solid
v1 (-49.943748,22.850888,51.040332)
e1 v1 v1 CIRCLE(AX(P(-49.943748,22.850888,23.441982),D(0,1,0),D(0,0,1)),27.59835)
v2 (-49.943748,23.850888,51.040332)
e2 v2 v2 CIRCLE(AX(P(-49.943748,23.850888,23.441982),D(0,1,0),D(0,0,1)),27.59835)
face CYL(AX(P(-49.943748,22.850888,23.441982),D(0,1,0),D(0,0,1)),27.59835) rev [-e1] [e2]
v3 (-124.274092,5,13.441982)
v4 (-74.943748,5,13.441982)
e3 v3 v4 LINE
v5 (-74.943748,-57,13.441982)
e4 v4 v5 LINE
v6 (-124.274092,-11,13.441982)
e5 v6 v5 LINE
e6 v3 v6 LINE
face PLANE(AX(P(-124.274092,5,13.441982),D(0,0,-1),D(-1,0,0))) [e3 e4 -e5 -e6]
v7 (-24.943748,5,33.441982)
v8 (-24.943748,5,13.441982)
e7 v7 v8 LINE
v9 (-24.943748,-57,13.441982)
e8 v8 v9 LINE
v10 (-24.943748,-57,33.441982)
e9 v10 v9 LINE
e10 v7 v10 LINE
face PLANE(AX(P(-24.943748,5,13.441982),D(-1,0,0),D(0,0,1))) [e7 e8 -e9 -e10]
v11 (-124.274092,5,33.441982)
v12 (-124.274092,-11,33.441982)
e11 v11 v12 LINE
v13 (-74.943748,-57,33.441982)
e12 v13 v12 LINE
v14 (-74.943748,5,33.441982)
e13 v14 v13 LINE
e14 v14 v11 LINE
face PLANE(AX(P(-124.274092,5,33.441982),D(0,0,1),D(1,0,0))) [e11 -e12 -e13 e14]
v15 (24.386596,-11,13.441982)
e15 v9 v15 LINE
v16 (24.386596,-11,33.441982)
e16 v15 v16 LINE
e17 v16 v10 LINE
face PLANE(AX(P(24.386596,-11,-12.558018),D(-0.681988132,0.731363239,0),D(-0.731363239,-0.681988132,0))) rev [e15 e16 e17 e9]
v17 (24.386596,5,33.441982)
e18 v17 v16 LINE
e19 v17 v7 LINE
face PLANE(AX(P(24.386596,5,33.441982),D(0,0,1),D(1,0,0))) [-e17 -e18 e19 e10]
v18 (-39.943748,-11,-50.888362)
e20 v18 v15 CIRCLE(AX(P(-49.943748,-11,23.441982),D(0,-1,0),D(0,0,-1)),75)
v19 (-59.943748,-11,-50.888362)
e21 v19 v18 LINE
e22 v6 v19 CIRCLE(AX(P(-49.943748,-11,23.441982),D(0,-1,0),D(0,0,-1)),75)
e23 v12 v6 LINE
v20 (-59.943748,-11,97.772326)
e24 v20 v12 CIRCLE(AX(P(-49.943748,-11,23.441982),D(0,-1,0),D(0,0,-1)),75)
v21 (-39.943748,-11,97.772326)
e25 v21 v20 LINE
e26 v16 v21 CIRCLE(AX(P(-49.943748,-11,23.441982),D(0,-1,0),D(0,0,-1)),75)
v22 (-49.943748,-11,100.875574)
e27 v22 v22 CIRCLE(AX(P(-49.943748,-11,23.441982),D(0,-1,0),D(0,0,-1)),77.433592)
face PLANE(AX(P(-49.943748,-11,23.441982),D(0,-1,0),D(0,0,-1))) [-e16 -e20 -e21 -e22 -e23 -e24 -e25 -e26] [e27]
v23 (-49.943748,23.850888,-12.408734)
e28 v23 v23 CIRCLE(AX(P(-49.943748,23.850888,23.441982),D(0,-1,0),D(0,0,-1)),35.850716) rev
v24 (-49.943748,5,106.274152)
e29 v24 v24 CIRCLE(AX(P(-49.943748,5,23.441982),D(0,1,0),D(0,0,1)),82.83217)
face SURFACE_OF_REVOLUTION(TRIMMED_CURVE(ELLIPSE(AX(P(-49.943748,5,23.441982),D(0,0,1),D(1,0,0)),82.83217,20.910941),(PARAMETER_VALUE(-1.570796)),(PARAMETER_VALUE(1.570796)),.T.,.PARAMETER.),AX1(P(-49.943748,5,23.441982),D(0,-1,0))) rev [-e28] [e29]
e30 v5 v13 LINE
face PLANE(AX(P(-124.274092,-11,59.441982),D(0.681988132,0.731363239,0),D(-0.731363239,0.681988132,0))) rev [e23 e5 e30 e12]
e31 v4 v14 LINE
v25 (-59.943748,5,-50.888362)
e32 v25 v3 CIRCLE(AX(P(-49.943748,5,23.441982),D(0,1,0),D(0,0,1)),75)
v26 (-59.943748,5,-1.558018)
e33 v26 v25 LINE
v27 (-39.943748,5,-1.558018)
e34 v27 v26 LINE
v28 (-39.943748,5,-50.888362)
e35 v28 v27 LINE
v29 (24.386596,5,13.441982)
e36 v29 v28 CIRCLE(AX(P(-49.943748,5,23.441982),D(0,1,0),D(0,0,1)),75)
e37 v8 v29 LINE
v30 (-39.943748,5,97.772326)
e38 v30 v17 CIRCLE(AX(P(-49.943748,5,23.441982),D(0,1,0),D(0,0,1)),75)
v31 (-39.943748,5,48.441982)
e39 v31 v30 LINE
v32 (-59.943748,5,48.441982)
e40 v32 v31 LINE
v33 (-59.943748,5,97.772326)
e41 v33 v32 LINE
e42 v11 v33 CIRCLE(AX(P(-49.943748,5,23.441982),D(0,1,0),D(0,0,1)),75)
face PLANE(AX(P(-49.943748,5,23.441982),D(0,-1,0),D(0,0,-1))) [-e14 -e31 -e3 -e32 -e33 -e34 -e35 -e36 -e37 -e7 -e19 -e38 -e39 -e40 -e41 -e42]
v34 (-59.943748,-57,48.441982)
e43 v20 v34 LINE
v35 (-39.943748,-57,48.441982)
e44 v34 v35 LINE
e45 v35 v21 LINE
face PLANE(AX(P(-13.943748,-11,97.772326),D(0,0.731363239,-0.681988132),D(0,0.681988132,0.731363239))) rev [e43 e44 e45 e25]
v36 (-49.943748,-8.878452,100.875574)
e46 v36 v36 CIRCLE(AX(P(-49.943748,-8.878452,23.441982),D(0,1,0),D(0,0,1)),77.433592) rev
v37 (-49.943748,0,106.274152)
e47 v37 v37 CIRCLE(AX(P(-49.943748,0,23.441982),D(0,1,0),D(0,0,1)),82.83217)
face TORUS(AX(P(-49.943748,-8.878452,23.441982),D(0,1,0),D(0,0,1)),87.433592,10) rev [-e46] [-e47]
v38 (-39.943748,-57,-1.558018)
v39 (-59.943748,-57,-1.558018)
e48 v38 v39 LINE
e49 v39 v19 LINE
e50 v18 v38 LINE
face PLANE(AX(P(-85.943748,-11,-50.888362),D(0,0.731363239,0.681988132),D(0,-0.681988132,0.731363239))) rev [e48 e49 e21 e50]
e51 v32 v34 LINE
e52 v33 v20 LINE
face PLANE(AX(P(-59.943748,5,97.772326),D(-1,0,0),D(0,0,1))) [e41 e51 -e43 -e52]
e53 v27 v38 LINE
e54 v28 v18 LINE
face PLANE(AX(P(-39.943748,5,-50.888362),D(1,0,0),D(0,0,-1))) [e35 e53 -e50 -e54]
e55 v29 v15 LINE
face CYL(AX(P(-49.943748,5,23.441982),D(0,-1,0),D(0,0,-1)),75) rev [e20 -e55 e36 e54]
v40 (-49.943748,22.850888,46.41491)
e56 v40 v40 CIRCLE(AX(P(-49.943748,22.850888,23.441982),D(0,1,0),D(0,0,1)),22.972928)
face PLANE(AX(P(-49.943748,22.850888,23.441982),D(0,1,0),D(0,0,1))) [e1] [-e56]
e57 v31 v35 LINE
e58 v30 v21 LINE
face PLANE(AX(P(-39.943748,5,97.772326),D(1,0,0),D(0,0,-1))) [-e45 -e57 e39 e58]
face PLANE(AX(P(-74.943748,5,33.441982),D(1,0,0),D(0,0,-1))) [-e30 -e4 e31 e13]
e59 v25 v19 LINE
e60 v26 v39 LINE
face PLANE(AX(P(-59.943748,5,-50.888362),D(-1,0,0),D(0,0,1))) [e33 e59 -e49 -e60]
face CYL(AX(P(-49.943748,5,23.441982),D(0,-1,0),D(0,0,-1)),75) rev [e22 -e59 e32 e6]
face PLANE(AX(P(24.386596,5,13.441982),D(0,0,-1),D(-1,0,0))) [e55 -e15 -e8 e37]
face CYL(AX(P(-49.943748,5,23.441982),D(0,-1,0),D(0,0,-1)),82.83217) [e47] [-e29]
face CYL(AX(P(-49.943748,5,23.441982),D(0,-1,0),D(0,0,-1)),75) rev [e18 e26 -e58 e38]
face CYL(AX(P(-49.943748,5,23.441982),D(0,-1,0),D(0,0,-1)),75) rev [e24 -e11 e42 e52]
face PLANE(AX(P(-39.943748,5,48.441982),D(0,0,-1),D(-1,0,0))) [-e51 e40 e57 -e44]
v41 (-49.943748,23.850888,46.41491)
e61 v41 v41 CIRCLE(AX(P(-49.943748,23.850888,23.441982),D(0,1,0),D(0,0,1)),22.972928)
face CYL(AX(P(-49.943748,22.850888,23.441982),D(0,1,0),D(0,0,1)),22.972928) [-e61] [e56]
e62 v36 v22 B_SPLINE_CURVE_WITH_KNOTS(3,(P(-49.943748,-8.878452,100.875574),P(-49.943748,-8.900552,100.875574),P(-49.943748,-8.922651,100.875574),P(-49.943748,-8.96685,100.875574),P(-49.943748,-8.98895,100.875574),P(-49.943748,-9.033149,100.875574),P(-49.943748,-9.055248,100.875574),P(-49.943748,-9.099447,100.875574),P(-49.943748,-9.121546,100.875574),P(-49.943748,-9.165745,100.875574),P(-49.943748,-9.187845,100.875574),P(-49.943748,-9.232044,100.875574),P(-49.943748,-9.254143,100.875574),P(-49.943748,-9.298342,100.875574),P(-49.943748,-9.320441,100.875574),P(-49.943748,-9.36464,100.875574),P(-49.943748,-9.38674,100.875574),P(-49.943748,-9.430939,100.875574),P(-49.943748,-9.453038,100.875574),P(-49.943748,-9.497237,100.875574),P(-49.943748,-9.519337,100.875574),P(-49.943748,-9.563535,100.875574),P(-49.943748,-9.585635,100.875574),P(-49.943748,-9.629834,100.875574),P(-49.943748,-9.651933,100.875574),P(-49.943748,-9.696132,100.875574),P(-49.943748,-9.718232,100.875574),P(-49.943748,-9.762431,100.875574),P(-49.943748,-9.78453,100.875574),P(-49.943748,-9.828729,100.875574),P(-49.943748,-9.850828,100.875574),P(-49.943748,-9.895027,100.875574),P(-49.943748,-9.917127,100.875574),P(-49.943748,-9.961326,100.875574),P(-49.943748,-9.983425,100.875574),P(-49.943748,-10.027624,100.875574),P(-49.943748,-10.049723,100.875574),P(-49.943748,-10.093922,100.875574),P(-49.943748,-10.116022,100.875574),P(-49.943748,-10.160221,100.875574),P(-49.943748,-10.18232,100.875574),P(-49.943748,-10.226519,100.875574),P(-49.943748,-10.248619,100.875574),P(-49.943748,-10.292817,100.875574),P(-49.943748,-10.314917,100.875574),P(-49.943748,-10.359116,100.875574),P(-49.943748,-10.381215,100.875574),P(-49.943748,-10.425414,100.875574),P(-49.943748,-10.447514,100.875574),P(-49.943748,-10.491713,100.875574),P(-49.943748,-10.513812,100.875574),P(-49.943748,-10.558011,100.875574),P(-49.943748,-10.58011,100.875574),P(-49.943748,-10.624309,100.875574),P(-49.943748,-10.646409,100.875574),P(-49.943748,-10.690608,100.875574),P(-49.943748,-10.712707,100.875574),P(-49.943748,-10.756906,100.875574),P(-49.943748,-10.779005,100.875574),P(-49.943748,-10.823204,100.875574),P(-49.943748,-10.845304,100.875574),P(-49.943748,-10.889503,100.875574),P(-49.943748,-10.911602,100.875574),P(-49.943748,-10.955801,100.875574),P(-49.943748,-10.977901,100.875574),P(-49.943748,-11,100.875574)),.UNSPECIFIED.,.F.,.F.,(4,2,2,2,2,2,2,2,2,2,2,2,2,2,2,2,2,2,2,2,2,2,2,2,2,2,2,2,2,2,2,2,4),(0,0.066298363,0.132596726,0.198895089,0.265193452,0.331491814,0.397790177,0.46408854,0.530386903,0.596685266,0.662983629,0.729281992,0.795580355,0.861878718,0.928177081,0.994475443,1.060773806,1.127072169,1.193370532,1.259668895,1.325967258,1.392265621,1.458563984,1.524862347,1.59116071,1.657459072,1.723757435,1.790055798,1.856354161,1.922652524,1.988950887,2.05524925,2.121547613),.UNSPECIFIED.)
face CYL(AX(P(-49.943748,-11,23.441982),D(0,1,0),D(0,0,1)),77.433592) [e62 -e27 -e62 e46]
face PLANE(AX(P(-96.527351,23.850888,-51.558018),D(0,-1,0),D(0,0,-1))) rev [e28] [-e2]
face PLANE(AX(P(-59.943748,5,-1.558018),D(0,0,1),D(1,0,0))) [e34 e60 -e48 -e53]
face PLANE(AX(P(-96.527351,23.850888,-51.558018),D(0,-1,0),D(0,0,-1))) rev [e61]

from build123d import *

# Parameters (mm, degrees)
SKETCH1_R           = 82.832169861
BOSS_EXTRUDE1_DEPTH = 5
SKETCH3_W           = 93.167206873
SKETCH3_H           = 4.120105984
CUT_EXTRUDE1_DEPTH  = 75
SKETCH4_R           = 27.598349682
SKETCH4_R_2         = 22.972927947
CUT_EXTRUDE2_DEPTH  = 1
BOSS_EXTRUDE2_START = 11
SKETCH5_R           = 77.433591729
BOSS_EXTRUDE2_DEPTH = 11
FILLET1_R           = 10
SKETCH6_W           = 49.330343736
SKETCH6_H           = 20
BOSS_EXTRUDE3_DEPTH = 46
CUT_EXTRUDE3_DEPTH  = 46
CIRPATTERN1_COUNT   = 4


with BuildPart() as part:
    # Sketch1 → Boss-Extrude1 (new body)
    with BuildSketch(Plane(origin=(0, 0, 0), x_dir=(1, 0, 0), z_dir=(0, 1, 0))):
        with Locations(Location((-49.943747887, -23.441982102, 0), (0, 0, 270))):
            Circle(SKETCH1_R)
        with BuildLine():
            Line((-59.943747887, 50.888361635), (-59.943747887, 1.558017898))
            Line((-59.943747887, 1.558017898), (-39.943747887, 1.558017898))
            Line((-39.943747887, 1.558017898), (-39.943747887, 50.888361635))
            ThreePointArc((-39.943747887, 50.888361635), (3.089260702, 29.591026487), (24.386595849, -13.441982102))
            Line((24.386595849, -13.441982102), (-24.943747887, -13.441982102))
            Line((-24.943747887, -13.441982102), (-24.943747887, -33.441982102))
            Line((-24.943747887, -33.441982102), (24.386595849, -33.441982102))
            ThreePointArc((24.386595849, -33.441982102), (3.089260702, -76.474990691), (-39.943747887, -97.772325838))
            Line((-39.943747887, -97.772325838), (-39.943747887, -48.441982102))
            Line((-39.943747887, -48.441982102), (-59.943747887, -48.441982102))
            Line((-59.943747887, -48.441982102), (-59.943747887, -97.772325838))
            ThreePointArc((-59.943747887, -97.772325838), (-102.976756476, -76.474990691), (-124.274091624, -33.441982102))
            Line((-124.274091624, -33.441982102), (-74.943747887, -33.441982102))
            Line((-74.943747887, -33.441982102), (-74.943747887, -13.441982102))
            Line((-74.943747887, -13.441982102), (-124.274091624, -13.441982102))
            ThreePointArc((-124.274091624, -13.441982102), (-102.976756476, 29.591026487), (-59.943747887, 50.888361635))
        make_face(mode=Mode.SUBTRACT)
    extrude(amount=BOSS_EXTRUDE1_DEPTH)

    # Sketch2 → Revolve1 (revolve)
    with BuildSketch(Plane.XY.offset(23.441982102)):
        with BuildLine():
            Line((-49.943747887, 5), (-49.943747887, 25.910941369))
            add(Edge.make_bspline(
                [(32.888421974, 5), (32.888421974, 25.910941369), (-49.943747887, 25.910941369)],
                knots=[0, 0, 0, 1.570796327, 1.570796327, 1.570796327], degree=2, weights=[1, 0.707106781, 1]))
            Line((32.888421974, 5), (-49.943747887, 5))
        make_face()
    revolve(axis=Axis((-49.943747887, 5, 23.441982102), (0, 1, 0)))

    # Sketch3 → Cut-Extrude1 (cut, symmetric)
    with BuildSketch(Plane.XY.offset(23.441982102)):
        with Locations((-49.943747888, 25.910941369)):
            Rectangle(SKETCH3_W, SKETCH3_H)
    extrude(amount=CUT_EXTRUDE1_DEPTH, both=True, mode=Mode.SUBTRACT)

    # Sketch4 → Cut-Extrude2 (cut)
    with BuildSketch(Plane(origin=(0, 23.850888377, 0), x_dir=(1, 0, 0), z_dir=(0, 1, 0))):
        with Locations(Location((-49.943747887, -23.441982102, 0), (0, 0, 270))):
            Circle(SKETCH4_R)
        with Locations(Location((-49.943747887, -23.441982102, 0), (0, 0, 270))):
            Circle(SKETCH4_R_2, mode=Mode.SUBTRACT)
    extrude(amount=-CUT_EXTRUDE2_DEPTH, mode=Mode.SUBTRACT)

    # Sketch5 → Boss-Extrude2 (add)
    with BuildSketch(Plane.XZ.offset(BOSS_EXTRUDE2_START)):
        with Locations(Location((-49.943747887, 23.441982102, 0), (0, 0, 90))):
            Circle(SKETCH5_R)
        with BuildLine():
            Line((-59.943747887, 97.772325838), (-59.943747887, 48.441982102))
            Line((-59.943747887, 48.441982102), (-39.943747887, 48.441982102))
            Line((-39.943747887, 48.441982102), (-39.943747887, 97.772325838))
            ThreePointArc((-39.943747887, 97.772325838), (3.089260702, 76.474990691), (24.386595849, 33.441982102))
            Line((24.386595849, 33.441982102), (-24.943747887, 33.441982102))
            Line((-24.943747887, 33.441982102), (-24.943747887, 13.441982102))
            Line((-24.943747887, 13.441982102), (24.386595849, 13.441982102))
            ThreePointArc((24.386595849, 13.441982102), (3.089260702, -29.591026487), (-39.943747887, -50.888361635))
            Line((-39.943747887, -50.888361635), (-39.943747887, -1.558017898))
            Line((-39.943747887, -1.558017898), (-59.943747887, -1.558017898))
            Line((-59.943747887, -1.558017898), (-59.943747887, -50.888361635))
            ThreePointArc((-59.943747887, -50.888361635), (-102.976756476, -29.591026487), (-124.274091624, 13.441982102))
            Line((-124.274091624, 13.441982102), (-74.943747887, 13.441982102))
            Line((-74.943747887, 13.441982102), (-74.943747887, 33.441982102))
            Line((-74.943747887, 33.441982102), (-124.274091624, 33.441982102))
            ThreePointArc((-124.274091624, 33.441982102), (-102.976756476, 76.474990691), (-59.943747887, 97.772325838))
        make_face(mode=Mode.SUBTRACT)
    extrude(amount=-BOSS_EXTRUDE2_DEPTH)

    # Fillet1
    # the kernel refuses this fillet: 10 mm, written as the material it adds along each edge
    with BuildSketch(Plane(origin=(-49.943747887, 0, 23.441982102), x_dir=(0, 0, 1), z_dir=(1, 0, 0))) as fillet1_piece_1:
        with BuildLine():
            CenterArc((87.433591729, 8.878452387), FILLET1_R, 180, 62.603717063)
            Line((77.433591729, 8.878452387), (77.233591729, 8.878452387))
            Line((77.233591729, 8.878452387), (77.233591729, 0))
            Line((77.233591729, 0), (77.433591729, -0.2))
            ThreePointArc((77.433591729, -0.2), (80.132880795, -0.2), (82.740141424, -0.177569048))
            Line((82.740141424, -0.177569048), (82.832169861, 0))
        make_face()
    revolve(axis=Axis((-49.943747887, 0, 23.441982102), (0, -1, 0)))

    # Sketch6 → Boss-Extrude3 (add)
    with BuildSketch(Plane.XZ.offset(11)):
        with Locations((-0.278576019, 23.441982102)):
            Rectangle(SKETCH6_W, SKETCH6_H)
    boss_extrude3 = extrude(amount=BOSS_EXTRUDE3_DEPTH)

    # Sketch7 → Cut-Extrude3 (cut)
    with BuildSketch(Plane.XY.offset(33.441982102)):
        Polygon((24.386595849, -11), (-24.943747887, -57), (24.386595849, -57), align=None)
    cut_extrude3 = extrude(amount=-CUT_EXTRUDE3_DEPTH, mode=Mode.SUBTRACT)

    # CirPattern1: Boss-Extrude3, Cut-Extrude3 ×4 about axis
    cirpattern1_axis = Axis((-49.943747887, 0, 23.441982102), (0, 1, 0))
    add([boss_extrude3.rotate(cirpattern1_axis, i * 360 / CIRPATTERN1_COUNT) for i in range(1, CIRPATTERN1_COUNT)])
    add([cut_extrude3.rotate(cirpattern1_axis, i * 360 / CIRPATTERN1_COUNT) for i in range(1, CIRPATTERN1_COUNT)], mode=Mode.SUBTRACT)


solid = part.part
